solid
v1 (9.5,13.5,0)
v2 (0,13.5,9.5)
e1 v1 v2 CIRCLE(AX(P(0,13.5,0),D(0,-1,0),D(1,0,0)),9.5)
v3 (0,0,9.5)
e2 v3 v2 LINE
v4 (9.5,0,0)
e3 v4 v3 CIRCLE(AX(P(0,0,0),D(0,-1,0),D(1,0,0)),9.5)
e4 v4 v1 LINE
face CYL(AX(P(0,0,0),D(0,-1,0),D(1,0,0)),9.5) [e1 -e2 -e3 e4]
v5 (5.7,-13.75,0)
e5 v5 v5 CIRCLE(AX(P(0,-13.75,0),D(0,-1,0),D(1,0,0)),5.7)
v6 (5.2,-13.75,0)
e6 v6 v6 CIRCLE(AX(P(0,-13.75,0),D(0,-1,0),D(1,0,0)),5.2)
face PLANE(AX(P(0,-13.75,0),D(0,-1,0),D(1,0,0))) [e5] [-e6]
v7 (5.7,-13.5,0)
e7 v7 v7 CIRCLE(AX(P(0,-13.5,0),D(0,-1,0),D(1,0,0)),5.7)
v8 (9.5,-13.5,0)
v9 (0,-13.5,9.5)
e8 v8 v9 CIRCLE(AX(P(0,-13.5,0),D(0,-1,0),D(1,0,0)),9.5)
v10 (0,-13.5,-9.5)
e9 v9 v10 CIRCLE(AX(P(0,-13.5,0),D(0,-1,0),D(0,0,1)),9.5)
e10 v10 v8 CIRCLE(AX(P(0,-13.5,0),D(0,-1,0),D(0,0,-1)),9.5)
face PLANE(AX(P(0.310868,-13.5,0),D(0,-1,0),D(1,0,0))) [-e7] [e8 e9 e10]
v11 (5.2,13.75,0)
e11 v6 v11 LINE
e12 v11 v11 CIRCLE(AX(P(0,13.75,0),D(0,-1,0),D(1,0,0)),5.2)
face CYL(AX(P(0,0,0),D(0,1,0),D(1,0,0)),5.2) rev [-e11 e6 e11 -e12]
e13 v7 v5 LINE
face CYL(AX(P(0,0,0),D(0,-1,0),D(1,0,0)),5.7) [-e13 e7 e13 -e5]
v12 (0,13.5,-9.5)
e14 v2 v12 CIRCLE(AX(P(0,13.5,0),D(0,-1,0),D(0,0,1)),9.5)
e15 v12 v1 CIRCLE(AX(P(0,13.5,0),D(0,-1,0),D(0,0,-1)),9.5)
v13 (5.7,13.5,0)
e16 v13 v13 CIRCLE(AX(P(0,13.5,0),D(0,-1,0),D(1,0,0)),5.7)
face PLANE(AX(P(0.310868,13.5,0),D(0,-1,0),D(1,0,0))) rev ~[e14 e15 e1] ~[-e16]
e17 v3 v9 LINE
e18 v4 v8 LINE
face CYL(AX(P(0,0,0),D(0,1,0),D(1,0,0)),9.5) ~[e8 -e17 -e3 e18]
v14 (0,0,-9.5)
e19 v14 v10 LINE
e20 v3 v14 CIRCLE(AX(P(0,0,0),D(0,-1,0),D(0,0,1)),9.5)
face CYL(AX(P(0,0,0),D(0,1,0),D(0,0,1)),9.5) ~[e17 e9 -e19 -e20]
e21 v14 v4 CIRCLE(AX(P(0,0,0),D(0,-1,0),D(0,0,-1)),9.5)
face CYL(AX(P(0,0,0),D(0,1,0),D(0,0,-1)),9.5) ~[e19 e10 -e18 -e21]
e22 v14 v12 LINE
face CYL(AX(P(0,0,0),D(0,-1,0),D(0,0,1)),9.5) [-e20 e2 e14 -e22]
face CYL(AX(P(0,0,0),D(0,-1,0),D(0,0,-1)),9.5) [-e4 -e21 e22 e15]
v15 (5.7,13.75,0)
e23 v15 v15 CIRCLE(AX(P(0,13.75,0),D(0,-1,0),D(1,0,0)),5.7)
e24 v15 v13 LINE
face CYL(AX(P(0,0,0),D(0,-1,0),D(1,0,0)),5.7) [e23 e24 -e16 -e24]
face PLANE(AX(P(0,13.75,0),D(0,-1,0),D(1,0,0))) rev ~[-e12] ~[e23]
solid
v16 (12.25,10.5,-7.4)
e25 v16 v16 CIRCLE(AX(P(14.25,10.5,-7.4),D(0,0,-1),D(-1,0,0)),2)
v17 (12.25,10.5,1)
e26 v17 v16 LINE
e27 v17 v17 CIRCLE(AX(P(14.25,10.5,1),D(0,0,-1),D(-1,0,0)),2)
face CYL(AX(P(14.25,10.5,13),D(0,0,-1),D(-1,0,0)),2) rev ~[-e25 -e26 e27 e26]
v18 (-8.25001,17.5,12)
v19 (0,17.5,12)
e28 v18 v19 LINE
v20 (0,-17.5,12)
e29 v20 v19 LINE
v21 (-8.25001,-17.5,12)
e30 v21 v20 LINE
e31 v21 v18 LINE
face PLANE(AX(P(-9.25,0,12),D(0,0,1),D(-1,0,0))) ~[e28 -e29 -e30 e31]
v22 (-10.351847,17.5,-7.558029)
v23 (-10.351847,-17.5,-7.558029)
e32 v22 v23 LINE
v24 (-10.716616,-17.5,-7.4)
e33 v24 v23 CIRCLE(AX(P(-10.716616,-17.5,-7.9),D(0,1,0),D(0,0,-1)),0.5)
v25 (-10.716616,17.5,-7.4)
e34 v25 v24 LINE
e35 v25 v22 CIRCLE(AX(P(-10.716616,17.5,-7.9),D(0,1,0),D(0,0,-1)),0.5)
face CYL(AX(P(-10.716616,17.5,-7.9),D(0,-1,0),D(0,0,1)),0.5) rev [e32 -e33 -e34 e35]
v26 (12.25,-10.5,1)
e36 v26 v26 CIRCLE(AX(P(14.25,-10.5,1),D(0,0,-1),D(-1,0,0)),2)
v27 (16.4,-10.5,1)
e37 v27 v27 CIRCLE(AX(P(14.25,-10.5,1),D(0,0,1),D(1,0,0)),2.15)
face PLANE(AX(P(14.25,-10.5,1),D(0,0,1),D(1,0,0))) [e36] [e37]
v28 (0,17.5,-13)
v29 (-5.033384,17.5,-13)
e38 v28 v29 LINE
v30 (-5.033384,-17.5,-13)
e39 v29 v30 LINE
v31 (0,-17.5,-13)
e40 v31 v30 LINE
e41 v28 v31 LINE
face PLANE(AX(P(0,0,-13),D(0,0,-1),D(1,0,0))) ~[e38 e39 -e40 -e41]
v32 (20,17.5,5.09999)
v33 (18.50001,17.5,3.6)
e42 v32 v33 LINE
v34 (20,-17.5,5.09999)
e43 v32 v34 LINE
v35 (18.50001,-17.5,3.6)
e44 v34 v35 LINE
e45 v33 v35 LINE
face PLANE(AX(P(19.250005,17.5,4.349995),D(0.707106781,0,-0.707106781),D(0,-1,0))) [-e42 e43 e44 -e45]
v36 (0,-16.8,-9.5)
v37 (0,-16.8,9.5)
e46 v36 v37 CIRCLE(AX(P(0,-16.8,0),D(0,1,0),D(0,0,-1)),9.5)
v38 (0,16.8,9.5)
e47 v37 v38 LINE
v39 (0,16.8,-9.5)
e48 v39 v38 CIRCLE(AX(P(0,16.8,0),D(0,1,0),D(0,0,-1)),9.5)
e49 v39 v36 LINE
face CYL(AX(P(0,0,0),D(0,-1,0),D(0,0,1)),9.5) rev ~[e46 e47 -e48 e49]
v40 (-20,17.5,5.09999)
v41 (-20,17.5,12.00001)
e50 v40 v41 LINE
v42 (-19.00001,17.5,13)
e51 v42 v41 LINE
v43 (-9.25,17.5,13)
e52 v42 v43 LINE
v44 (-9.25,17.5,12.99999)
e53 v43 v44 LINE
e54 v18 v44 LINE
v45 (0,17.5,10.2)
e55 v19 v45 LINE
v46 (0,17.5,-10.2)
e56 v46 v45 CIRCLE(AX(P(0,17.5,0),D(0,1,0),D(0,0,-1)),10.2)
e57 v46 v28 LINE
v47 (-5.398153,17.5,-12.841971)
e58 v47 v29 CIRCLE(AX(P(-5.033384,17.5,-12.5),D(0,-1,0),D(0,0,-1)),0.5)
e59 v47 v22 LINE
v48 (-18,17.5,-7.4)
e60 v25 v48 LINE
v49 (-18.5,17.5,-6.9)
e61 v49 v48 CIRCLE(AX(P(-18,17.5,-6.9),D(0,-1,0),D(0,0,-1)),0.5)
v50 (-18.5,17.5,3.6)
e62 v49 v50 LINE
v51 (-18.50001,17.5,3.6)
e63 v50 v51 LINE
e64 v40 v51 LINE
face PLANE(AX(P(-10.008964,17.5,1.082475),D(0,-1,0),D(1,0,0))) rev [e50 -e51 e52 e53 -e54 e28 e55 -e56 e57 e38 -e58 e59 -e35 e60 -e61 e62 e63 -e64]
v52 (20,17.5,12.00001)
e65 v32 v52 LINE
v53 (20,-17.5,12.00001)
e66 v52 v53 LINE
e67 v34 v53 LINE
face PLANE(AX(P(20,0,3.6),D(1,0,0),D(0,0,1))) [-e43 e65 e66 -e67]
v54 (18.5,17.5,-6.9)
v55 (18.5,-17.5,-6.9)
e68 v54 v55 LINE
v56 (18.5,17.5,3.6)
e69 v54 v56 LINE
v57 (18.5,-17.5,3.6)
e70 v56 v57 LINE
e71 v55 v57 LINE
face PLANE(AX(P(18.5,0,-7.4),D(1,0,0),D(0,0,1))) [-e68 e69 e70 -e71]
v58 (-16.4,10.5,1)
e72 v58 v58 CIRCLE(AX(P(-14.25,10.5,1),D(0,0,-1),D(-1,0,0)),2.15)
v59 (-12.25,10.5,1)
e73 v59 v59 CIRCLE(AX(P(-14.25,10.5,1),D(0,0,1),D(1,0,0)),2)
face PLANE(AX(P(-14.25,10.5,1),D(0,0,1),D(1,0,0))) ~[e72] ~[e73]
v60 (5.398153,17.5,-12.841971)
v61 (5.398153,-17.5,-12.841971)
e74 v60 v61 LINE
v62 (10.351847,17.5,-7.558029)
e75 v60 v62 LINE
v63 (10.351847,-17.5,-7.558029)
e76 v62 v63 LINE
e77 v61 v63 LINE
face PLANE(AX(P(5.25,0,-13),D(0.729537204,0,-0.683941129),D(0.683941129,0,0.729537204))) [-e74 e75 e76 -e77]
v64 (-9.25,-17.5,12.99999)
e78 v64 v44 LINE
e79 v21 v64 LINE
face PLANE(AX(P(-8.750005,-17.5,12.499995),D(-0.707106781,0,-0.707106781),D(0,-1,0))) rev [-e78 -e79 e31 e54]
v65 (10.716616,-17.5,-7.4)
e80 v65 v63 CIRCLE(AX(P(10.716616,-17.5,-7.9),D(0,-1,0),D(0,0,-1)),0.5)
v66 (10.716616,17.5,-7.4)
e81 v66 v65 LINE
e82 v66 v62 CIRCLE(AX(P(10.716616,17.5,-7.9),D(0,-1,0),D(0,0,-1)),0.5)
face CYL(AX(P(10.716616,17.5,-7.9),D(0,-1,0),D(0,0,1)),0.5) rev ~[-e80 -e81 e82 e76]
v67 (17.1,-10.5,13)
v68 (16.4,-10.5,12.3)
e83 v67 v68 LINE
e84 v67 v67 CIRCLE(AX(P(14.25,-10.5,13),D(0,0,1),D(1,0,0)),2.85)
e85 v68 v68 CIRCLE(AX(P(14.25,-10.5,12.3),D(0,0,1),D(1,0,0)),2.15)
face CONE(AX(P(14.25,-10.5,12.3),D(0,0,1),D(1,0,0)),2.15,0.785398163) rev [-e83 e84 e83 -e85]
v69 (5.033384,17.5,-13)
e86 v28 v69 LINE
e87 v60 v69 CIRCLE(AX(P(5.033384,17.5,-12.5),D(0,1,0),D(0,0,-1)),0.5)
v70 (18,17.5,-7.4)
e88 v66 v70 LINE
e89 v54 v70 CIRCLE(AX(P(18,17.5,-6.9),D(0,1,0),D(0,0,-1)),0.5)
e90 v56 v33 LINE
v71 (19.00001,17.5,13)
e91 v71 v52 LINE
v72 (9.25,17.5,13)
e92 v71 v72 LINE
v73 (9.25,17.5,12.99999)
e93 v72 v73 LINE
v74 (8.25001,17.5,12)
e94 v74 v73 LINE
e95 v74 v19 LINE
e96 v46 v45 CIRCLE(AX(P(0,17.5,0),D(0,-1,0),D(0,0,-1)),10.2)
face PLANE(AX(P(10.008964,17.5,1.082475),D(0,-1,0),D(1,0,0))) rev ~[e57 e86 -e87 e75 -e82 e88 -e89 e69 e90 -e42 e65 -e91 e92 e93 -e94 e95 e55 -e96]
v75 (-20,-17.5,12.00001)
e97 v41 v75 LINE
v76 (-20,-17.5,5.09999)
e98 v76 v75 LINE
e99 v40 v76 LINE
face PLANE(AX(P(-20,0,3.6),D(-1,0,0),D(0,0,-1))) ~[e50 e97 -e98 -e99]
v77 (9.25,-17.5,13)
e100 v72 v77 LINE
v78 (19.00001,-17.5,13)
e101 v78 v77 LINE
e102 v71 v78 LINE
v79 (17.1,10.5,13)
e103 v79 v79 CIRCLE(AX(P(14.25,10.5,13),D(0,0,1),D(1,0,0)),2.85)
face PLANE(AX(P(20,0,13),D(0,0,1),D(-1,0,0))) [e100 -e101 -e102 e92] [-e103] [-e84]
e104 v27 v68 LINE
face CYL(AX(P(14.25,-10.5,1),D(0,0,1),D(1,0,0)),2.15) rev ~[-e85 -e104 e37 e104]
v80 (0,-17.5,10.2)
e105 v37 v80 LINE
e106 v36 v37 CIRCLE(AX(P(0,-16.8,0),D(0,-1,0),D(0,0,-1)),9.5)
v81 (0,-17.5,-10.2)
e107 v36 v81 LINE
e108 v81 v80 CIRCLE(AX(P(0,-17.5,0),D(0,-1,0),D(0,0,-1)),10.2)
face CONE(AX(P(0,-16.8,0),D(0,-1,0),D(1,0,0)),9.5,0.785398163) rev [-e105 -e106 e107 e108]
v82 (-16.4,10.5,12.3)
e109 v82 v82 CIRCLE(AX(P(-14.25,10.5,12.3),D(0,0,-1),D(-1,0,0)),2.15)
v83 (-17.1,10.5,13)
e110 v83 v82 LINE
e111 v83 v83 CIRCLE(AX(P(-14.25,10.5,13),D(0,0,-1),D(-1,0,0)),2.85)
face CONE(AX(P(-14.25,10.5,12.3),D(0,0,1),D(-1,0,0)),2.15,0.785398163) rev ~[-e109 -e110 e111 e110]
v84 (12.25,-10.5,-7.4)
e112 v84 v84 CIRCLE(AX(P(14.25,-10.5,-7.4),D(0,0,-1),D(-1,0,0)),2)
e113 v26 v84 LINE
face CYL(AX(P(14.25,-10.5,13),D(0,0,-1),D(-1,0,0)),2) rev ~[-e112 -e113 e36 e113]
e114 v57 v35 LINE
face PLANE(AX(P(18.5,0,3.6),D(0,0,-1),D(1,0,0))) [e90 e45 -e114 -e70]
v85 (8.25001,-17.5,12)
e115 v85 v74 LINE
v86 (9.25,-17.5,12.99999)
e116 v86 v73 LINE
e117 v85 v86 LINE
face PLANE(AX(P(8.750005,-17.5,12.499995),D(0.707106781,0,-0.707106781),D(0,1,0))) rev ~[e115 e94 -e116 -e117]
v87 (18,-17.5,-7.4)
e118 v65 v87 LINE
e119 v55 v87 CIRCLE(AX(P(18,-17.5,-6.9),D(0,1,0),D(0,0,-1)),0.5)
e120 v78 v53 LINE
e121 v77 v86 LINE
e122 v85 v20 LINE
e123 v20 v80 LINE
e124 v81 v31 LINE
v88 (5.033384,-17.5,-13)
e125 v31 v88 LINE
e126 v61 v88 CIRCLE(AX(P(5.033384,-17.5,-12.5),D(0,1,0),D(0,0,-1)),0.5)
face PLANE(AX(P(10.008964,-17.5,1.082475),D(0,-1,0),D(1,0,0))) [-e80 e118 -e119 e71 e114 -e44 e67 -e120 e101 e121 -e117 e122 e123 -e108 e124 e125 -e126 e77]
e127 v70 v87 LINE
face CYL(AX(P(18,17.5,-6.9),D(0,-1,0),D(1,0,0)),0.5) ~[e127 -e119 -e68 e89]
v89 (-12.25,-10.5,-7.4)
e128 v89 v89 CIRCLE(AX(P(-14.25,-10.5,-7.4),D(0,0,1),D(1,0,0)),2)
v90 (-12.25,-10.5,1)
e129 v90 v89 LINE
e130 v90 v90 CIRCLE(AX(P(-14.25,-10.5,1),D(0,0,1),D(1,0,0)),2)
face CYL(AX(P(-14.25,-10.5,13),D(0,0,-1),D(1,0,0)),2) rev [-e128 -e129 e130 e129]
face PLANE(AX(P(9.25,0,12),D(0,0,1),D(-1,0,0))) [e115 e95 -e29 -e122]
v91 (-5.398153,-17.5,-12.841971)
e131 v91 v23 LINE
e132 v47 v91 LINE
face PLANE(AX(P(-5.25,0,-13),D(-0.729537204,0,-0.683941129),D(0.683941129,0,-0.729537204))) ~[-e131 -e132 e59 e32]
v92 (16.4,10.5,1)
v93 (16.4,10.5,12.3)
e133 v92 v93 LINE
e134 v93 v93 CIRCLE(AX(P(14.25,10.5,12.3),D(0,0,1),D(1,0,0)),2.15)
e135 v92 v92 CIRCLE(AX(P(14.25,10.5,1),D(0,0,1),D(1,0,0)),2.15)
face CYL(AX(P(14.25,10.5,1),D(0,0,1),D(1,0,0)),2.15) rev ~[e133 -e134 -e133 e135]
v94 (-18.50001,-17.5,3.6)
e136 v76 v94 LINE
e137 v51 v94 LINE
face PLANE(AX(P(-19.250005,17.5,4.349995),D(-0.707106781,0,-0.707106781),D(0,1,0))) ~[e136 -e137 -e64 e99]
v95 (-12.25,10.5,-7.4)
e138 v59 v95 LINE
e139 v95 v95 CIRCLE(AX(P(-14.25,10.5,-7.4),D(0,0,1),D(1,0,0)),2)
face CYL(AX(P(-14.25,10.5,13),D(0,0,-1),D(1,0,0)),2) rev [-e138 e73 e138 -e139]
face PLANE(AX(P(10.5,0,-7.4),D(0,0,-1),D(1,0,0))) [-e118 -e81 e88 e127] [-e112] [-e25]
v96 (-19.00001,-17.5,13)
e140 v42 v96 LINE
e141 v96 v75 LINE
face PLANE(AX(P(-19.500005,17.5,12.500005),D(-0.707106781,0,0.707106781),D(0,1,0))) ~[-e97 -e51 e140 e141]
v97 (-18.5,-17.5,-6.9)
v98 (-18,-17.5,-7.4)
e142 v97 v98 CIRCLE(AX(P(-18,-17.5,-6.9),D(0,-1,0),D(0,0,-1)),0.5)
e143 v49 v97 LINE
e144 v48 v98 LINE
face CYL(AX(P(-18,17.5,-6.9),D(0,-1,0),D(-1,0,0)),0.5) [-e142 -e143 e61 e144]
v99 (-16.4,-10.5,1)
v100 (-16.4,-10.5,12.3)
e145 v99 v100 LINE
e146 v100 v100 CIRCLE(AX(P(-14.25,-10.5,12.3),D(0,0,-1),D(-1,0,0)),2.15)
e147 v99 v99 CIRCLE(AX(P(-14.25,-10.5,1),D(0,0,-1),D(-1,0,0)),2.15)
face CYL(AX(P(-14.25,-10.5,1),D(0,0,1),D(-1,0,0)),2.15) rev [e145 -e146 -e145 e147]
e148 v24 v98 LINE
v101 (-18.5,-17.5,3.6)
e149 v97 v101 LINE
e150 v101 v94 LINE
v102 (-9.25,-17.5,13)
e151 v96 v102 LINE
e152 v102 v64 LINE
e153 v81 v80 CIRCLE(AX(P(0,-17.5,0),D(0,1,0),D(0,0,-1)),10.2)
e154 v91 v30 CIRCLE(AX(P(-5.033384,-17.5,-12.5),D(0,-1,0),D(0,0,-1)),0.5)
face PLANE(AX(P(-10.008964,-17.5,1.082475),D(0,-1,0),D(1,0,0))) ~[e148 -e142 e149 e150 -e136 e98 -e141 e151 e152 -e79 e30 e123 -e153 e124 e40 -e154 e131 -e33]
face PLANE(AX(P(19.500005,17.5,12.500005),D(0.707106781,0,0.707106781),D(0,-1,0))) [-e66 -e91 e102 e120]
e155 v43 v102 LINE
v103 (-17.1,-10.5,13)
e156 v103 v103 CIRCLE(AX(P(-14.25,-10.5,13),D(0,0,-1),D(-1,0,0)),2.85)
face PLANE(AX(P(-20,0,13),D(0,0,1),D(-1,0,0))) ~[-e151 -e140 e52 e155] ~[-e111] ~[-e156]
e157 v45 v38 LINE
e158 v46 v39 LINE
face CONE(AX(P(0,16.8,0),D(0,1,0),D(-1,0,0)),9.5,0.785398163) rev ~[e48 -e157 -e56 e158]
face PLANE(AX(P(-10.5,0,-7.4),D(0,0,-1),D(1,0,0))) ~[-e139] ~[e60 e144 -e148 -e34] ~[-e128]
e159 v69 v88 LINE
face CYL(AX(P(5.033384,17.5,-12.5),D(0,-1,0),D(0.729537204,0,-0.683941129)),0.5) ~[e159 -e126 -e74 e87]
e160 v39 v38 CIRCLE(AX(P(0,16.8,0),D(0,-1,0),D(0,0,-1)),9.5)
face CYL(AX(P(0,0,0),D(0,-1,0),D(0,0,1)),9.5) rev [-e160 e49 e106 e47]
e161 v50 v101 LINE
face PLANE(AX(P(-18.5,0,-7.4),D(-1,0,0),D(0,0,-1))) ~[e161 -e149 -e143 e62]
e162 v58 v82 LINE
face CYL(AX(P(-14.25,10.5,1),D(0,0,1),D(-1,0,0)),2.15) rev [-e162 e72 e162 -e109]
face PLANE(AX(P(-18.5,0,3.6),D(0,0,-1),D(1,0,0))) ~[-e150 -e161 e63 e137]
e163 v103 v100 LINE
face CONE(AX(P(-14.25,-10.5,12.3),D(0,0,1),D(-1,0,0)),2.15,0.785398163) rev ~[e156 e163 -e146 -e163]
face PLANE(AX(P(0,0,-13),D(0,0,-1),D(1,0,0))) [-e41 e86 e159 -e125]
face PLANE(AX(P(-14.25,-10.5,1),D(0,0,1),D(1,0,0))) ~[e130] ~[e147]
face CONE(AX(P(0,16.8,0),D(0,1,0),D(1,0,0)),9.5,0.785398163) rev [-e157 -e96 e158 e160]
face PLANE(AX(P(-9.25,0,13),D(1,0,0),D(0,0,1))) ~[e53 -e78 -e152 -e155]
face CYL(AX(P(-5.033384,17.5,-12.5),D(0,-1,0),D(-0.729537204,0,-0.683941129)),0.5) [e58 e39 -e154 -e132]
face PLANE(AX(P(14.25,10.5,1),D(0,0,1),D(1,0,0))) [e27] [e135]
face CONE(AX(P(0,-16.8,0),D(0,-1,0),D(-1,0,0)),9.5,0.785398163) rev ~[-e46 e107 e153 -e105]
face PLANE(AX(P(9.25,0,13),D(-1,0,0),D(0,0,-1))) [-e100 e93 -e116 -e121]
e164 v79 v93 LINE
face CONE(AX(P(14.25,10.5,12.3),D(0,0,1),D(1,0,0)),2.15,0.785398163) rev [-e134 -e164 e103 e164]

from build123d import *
from build123d import SkipClean  # not in build123d's __all__

# Parameters (mm, degrees)
F1_DEPTH       = 17.5
F2_SIZE        = 0.99999
F3_SIZE        = 1.49999
F4_R           = 0.5
F6_D           = 4
F6_CBORE_D     = 4.3
F6_CBORE_DEPTH = 12
F7_SIZE        = 0.7
F0_R           = 5.7
F8_DEPTH       = 13.5
F0_R_2         = 5.2
F9_DEPTH       = 13.75


# Not quite as in the source:
# - a fillet or chamfer is up to 0.001 mm smaller than in the source, because OpenCascade refuses the exact size


with BuildPart() as f1:
    # F0 (on Front) → F1 (new body, symmetric)
    with BuildSketch(Plane.XZ):
        with BuildLine():
            ThreePointArc((0, 9.5), (6.7175144213, 6.7175144213), (9.5, 0))
            ThreePointArc((9.5, 0), (6.7175144213, -6.7175144213), (0, -9.5))
            Line((0, -9.5), (0, -13))
            Line((0, -13), (5.25, -13))
            Line((5.25, -13), (10.5, -7.4))
            Line((10.5, -7.4), (18.5, -7.4))
            Line((18.5, -7.4), (18.5, 3.6))
            Line((18.5, 3.6), (20, 3.6))
            Line((20, 3.6), (20, 13))
            Line((20, 13), (9.25, 13))
            Line((9.25, 13), (9.25, 12))
            Line((9.25, 12), (0, 12))
            Line((0, 12), (0, 9.5))
        make_face()
    extrude(amount=F1_DEPTH, both=True)

    # F2 (size 1 in the source; OpenCascade refuses exactly that, so slightly less here)
    f2_edges = [f1.edges().sort_by_distance(p)[0] for p in [
        (9.25, 0, 12),
        (20, 0, 13),
    ]]
    chamfer(f2_edges, length=F2_SIZE)

    # F3 (size 1.5 in the source; OpenCascade refuses exactly that, so slightly less here)
    f3_edges = [f1.edges().sort_by_distance(p)[0] for p in [
        (20, 0, 3.6),
    ]]
    chamfer(f3_edges, length=F3_SIZE)

    # F4
    f4_edges = [f1.edges().sort_by_distance(p)[0] for p in [
        (18.5, 0, -7.4),
        (10.5, 0, -7.4),
        (5.25, 0, -13),
    ]]
    fillet(f4_edges, radius=F4_R)

    # F6 (through all)
    with Locations(Plane.XY.offset(13)):
        with Locations((14.25, 10.5), (14.25, -10.5)):
            CounterBoreHole(F6_D / 2, F6_CBORE_D / 2, F6_CBORE_DEPTH)

    # F7
    f7_edges = [f1.edges().sort_by_distance(p)[0] for p in [
        (9.5, -17.5, 0),
        (9.5, 17.5, 0),
        (12.1, 10.5, 13),
        (12.1, -10.5, 13),
    ]]
    chamfer(f7_edges, length=F7_SIZE)

    # F10: F1 across plane


with BuildPart() as f8:
    # F0 (on Front) → F8 (new body, symmetric)
    with BuildSketch(Plane.XZ):
        with BuildLine():
            ThreePointArc((0, -9.5), (6.7175144213, -6.7175144213), (9.5, 0))
            ThreePointArc((9.5, 0), (6.7175144213, 6.7175144213), (0, 9.5))
            ThreePointArc((0, 9.5), (-9.5, 0), (0, -9.5))
        make_face()
        Circle(F0_R, mode=Mode.SUBTRACT)
    extrude(amount=F8_DEPTH, both=True)

    # F0 (on Front) → F9 (join, symmetric)
    with BuildSketch(Plane.XZ):
        Circle(F0_R)
        Circle(F0_R_2, mode=Mode.SUBTRACT)
    extrude(amount=F9_DEPTH, both=True)


with BuildPart() as f1_1:
    add(f1.part, clean=False)
    with SkipClean():  # cleaning this boolean's faces spoils the solid; the shape is the same uncleaned
        add(f1.part.mirror(Plane.YZ), clean=False)


solid = Compound([f8.part, f1_1.part])
